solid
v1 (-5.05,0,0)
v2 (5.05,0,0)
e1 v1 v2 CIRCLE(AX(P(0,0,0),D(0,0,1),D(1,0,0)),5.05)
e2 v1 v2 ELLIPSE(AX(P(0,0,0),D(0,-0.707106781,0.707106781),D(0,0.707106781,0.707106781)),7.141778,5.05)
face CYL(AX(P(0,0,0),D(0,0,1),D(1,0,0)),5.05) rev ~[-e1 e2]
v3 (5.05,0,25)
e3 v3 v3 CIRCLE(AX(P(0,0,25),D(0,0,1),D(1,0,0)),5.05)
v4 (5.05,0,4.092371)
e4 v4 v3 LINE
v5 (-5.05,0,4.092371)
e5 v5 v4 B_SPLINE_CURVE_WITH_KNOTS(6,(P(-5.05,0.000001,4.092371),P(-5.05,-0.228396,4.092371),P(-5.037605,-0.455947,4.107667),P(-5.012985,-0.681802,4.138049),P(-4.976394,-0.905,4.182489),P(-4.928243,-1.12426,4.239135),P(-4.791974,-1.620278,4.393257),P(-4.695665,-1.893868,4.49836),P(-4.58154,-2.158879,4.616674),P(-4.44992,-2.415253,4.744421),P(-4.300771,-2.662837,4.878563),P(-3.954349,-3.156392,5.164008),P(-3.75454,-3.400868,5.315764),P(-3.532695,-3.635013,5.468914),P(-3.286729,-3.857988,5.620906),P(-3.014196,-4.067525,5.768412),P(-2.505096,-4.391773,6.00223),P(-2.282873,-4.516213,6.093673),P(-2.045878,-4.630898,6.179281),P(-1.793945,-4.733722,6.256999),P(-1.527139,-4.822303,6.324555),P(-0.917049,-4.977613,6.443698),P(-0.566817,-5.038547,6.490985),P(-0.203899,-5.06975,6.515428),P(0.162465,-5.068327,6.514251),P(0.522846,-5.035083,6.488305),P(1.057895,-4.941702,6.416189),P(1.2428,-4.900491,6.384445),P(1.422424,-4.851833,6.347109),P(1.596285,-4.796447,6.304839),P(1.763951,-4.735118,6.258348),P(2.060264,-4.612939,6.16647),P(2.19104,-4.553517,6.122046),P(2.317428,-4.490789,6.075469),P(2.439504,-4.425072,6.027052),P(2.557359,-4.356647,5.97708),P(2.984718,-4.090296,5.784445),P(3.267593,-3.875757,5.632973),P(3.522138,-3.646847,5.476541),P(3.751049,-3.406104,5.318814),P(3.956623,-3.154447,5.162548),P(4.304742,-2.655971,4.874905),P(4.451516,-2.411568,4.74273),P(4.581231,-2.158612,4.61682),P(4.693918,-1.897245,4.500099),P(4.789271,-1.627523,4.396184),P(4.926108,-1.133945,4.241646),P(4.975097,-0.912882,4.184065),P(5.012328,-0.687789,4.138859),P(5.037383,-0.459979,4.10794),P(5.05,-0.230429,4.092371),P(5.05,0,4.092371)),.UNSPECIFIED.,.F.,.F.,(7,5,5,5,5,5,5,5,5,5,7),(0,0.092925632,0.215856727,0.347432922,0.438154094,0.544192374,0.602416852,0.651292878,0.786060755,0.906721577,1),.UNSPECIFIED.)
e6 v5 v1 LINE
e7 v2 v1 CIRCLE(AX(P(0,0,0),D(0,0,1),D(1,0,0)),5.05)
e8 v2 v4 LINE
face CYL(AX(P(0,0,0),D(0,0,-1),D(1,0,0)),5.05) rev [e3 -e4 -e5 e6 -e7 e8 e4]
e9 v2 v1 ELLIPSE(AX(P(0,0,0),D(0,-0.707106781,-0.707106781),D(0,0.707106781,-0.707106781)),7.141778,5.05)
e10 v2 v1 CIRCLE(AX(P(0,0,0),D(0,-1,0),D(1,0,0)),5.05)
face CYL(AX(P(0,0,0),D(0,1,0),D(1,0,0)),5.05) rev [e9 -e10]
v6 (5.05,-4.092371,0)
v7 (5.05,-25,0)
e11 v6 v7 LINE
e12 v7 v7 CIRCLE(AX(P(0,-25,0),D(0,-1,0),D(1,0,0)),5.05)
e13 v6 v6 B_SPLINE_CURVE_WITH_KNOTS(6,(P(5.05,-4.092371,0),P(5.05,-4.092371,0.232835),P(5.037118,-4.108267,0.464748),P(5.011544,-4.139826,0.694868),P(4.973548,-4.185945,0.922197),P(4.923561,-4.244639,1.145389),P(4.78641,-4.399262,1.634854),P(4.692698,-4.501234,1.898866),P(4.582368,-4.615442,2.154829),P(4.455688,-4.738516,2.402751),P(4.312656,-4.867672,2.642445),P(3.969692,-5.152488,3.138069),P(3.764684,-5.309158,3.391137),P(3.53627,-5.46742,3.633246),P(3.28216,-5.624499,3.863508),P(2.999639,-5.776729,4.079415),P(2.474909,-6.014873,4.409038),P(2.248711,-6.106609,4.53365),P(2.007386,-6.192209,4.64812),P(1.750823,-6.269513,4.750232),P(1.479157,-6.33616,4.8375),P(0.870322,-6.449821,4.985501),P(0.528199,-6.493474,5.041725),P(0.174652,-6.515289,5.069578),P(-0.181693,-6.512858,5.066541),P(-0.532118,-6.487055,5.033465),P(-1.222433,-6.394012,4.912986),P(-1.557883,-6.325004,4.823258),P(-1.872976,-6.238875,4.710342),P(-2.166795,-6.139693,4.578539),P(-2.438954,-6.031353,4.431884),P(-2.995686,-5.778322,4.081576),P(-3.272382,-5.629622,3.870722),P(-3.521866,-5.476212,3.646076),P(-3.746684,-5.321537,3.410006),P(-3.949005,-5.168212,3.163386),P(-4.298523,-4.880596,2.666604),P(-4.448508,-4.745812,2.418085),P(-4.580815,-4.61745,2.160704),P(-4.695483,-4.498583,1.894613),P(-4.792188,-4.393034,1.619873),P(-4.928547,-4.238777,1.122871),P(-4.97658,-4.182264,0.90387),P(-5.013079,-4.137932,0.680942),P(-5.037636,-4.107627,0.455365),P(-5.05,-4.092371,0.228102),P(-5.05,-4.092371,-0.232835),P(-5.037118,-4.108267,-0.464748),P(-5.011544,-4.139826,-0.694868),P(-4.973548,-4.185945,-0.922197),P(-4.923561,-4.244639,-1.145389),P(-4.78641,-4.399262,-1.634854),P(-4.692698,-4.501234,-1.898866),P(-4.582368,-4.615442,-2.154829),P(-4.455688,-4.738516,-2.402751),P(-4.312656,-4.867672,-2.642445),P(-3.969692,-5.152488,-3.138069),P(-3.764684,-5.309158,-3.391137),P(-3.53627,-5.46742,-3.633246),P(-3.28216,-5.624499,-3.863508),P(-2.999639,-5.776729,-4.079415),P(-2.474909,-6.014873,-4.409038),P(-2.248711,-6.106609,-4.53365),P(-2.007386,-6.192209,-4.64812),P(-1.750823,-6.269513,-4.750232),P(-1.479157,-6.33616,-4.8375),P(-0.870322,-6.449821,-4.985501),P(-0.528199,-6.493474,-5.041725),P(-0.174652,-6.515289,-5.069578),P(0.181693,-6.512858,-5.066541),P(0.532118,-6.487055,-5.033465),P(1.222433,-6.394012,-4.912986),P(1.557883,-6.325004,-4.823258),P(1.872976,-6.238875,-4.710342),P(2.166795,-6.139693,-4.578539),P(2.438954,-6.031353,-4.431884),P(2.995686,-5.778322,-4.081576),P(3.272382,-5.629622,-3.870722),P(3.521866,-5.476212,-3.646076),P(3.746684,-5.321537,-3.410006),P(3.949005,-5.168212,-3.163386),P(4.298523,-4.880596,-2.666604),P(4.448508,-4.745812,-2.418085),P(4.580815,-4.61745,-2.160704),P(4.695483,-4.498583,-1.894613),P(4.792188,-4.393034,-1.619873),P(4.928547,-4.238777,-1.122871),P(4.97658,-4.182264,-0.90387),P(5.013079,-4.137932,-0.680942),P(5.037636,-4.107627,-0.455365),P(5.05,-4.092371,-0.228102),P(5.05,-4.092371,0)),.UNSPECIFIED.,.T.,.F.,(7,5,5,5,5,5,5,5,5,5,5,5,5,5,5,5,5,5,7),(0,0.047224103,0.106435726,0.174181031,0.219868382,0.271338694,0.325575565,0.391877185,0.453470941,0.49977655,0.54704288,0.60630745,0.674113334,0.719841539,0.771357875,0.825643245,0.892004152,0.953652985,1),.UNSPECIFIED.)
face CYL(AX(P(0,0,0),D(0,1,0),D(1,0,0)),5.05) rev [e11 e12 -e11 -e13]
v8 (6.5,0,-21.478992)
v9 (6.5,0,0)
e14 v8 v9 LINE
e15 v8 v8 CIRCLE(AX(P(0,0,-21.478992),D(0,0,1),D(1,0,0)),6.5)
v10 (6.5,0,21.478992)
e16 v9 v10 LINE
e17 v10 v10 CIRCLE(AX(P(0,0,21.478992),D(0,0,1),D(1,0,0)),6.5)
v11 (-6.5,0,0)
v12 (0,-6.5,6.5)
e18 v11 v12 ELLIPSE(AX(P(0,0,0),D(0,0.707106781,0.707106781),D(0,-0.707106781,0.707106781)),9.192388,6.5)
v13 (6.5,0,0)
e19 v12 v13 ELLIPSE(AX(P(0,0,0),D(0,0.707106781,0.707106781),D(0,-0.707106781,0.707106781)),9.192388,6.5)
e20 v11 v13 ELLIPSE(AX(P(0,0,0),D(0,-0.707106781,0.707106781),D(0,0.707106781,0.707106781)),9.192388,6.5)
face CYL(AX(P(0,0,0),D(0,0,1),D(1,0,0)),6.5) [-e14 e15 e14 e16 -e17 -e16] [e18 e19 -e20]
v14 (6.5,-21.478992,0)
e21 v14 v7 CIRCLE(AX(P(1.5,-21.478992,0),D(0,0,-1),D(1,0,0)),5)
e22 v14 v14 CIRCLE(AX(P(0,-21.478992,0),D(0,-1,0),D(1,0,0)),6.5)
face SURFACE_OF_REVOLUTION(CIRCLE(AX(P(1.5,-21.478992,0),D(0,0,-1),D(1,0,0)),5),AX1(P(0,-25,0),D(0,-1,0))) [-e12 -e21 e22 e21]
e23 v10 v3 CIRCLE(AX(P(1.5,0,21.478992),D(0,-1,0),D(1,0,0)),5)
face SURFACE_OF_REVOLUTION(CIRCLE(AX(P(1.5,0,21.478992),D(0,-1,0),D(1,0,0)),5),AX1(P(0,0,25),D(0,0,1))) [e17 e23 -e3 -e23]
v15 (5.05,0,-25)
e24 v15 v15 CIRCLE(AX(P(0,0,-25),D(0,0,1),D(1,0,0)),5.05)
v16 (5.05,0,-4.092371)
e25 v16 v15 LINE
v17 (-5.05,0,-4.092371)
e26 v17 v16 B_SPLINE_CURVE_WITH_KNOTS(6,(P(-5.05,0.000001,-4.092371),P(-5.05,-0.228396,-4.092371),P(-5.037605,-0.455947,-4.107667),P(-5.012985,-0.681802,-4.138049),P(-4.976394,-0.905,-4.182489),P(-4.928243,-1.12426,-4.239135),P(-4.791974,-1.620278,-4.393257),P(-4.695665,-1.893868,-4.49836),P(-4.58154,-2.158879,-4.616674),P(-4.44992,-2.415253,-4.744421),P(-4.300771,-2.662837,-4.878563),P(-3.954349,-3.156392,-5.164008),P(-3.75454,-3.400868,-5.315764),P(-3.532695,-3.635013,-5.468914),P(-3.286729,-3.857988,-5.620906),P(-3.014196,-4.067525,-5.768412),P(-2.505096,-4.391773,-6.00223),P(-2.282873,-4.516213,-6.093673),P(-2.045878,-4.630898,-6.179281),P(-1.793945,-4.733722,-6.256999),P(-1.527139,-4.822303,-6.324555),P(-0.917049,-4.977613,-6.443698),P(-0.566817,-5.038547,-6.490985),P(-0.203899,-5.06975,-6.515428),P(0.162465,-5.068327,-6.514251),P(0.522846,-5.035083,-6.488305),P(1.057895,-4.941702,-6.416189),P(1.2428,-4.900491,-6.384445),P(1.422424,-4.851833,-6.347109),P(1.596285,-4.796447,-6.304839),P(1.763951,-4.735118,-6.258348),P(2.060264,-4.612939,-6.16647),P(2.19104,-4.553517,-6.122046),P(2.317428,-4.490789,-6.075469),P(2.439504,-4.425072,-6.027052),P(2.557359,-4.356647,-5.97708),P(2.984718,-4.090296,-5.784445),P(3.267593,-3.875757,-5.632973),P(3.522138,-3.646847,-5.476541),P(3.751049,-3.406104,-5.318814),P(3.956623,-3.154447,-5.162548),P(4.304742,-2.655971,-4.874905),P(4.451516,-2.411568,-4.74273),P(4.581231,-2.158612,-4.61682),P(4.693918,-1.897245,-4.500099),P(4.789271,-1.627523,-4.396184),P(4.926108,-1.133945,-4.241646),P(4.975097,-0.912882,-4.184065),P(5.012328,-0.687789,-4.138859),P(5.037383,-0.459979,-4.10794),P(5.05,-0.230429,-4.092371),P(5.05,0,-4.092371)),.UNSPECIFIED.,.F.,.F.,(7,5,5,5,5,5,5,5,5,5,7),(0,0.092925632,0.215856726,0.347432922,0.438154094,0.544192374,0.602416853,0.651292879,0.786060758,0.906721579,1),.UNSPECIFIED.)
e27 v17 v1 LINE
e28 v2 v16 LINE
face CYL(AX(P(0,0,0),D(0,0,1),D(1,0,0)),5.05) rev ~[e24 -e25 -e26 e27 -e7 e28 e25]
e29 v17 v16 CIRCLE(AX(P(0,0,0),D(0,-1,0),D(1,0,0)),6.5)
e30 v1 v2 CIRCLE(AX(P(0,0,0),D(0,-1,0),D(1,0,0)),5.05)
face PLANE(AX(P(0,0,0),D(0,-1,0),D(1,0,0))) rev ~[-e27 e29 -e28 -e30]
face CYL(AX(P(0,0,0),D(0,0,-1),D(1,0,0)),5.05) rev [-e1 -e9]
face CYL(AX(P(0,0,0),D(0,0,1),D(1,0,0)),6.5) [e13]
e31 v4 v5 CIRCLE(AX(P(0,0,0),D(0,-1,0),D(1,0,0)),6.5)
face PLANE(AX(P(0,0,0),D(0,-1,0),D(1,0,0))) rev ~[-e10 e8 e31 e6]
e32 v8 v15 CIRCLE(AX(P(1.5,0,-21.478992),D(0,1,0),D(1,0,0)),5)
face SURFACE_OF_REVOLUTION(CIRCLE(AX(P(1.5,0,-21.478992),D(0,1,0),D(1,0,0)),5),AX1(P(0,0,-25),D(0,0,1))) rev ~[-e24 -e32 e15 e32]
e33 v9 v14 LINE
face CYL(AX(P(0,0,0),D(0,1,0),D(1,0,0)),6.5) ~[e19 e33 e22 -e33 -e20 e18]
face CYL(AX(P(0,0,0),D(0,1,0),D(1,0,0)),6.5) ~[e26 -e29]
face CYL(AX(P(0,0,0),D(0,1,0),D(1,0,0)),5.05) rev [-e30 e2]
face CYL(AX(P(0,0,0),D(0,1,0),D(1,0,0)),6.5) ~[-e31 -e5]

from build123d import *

# Parameters (mm, degrees)
F0_R     = 6.5
F0_R_2   = 5.05
F1_DEPTH = 25
F2_DEPTH = 25
F3_R     = 6.5
F3_R_2   = 5.05
F4_DEPTH = 25


# Not quite as in the source:
# - a fillet or chamfer that OpenCascade refuses, or shapes differently, is made with other operations: its cross-section is extruded or revolved along the edge and cut away or added


with BuildPart() as f1:
    # F0 (on Top) → F1 (new body)
    with BuildSketch(Plane.XY):
        Circle(F0_R)
        Circle(F0_R_2, mode=Mode.SUBTRACT)
    extrude(amount=F1_DEPTH)

    # F0 (on Top) → F2 (join)
    with BuildSketch(Plane.XY):
        Circle(F0_R)
        Circle(F0_R_2, mode=Mode.SUBTRACT)
    extrude(amount=-F2_DEPTH)

    # F3 (on Front) → F4 (join)
    with BuildSketch(Plane.XZ):
        Circle(F3_R)
        Circle(F3_R_2, mode=Mode.SUBTRACT)
    extrude(amount=F4_DEPTH)

    # F5: fillet of radius 5 on 3 edges, made by hand

    # F5_s1 → F5_t2 (revolve, cut)
    with BuildSketch(Plane.XY):
        with BuildLine():
            ThreePointArc((6.5, -21.4789916217), (6.1233105022, -23.3829348982), (5.05, -25))
            Line((5.05, -25), (6.5, -25))
            Line((6.5, -25), (6.5, -21.4789916217))
        make_face()
    revolve(axis=Axis((0, -25, 0), (0, -1, 0)), mode=Mode.SUBTRACT)

    # F5_s3 → F5_t4 (revolve, cut)
    with BuildSketch(Plane.XZ):
        with BuildLine():
            ThreePointArc((6.5, -21.4789916217), (6.1233105022, -23.3829348982), (5.05, -25))
            Line((5.05, -25), (6.5, -25))
            Line((6.5, -25), (6.5, -21.4789916217))
        make_face()
    revolve(axis=Axis((0, 0, -25), (0, 0, 1)), mode=Mode.SUBTRACT)

    # F5_s5 → F5_t6 (revolve, cut)
    with BuildSketch(Plane.XZ):
        with BuildLine():
            ThreePointArc((6.5, 21.4789916217), (6.1233105022, 23.3829348982), (5.05, 25))
            Line((5.05, 25), (6.5, 25))
            Line((6.5, 25), (6.5, 21.4789916217))
        make_face()
    revolve(axis=Axis((0, 0, 25), (0, 0, 1)), mode=Mode.SUBTRACT)


solid = f1.part
